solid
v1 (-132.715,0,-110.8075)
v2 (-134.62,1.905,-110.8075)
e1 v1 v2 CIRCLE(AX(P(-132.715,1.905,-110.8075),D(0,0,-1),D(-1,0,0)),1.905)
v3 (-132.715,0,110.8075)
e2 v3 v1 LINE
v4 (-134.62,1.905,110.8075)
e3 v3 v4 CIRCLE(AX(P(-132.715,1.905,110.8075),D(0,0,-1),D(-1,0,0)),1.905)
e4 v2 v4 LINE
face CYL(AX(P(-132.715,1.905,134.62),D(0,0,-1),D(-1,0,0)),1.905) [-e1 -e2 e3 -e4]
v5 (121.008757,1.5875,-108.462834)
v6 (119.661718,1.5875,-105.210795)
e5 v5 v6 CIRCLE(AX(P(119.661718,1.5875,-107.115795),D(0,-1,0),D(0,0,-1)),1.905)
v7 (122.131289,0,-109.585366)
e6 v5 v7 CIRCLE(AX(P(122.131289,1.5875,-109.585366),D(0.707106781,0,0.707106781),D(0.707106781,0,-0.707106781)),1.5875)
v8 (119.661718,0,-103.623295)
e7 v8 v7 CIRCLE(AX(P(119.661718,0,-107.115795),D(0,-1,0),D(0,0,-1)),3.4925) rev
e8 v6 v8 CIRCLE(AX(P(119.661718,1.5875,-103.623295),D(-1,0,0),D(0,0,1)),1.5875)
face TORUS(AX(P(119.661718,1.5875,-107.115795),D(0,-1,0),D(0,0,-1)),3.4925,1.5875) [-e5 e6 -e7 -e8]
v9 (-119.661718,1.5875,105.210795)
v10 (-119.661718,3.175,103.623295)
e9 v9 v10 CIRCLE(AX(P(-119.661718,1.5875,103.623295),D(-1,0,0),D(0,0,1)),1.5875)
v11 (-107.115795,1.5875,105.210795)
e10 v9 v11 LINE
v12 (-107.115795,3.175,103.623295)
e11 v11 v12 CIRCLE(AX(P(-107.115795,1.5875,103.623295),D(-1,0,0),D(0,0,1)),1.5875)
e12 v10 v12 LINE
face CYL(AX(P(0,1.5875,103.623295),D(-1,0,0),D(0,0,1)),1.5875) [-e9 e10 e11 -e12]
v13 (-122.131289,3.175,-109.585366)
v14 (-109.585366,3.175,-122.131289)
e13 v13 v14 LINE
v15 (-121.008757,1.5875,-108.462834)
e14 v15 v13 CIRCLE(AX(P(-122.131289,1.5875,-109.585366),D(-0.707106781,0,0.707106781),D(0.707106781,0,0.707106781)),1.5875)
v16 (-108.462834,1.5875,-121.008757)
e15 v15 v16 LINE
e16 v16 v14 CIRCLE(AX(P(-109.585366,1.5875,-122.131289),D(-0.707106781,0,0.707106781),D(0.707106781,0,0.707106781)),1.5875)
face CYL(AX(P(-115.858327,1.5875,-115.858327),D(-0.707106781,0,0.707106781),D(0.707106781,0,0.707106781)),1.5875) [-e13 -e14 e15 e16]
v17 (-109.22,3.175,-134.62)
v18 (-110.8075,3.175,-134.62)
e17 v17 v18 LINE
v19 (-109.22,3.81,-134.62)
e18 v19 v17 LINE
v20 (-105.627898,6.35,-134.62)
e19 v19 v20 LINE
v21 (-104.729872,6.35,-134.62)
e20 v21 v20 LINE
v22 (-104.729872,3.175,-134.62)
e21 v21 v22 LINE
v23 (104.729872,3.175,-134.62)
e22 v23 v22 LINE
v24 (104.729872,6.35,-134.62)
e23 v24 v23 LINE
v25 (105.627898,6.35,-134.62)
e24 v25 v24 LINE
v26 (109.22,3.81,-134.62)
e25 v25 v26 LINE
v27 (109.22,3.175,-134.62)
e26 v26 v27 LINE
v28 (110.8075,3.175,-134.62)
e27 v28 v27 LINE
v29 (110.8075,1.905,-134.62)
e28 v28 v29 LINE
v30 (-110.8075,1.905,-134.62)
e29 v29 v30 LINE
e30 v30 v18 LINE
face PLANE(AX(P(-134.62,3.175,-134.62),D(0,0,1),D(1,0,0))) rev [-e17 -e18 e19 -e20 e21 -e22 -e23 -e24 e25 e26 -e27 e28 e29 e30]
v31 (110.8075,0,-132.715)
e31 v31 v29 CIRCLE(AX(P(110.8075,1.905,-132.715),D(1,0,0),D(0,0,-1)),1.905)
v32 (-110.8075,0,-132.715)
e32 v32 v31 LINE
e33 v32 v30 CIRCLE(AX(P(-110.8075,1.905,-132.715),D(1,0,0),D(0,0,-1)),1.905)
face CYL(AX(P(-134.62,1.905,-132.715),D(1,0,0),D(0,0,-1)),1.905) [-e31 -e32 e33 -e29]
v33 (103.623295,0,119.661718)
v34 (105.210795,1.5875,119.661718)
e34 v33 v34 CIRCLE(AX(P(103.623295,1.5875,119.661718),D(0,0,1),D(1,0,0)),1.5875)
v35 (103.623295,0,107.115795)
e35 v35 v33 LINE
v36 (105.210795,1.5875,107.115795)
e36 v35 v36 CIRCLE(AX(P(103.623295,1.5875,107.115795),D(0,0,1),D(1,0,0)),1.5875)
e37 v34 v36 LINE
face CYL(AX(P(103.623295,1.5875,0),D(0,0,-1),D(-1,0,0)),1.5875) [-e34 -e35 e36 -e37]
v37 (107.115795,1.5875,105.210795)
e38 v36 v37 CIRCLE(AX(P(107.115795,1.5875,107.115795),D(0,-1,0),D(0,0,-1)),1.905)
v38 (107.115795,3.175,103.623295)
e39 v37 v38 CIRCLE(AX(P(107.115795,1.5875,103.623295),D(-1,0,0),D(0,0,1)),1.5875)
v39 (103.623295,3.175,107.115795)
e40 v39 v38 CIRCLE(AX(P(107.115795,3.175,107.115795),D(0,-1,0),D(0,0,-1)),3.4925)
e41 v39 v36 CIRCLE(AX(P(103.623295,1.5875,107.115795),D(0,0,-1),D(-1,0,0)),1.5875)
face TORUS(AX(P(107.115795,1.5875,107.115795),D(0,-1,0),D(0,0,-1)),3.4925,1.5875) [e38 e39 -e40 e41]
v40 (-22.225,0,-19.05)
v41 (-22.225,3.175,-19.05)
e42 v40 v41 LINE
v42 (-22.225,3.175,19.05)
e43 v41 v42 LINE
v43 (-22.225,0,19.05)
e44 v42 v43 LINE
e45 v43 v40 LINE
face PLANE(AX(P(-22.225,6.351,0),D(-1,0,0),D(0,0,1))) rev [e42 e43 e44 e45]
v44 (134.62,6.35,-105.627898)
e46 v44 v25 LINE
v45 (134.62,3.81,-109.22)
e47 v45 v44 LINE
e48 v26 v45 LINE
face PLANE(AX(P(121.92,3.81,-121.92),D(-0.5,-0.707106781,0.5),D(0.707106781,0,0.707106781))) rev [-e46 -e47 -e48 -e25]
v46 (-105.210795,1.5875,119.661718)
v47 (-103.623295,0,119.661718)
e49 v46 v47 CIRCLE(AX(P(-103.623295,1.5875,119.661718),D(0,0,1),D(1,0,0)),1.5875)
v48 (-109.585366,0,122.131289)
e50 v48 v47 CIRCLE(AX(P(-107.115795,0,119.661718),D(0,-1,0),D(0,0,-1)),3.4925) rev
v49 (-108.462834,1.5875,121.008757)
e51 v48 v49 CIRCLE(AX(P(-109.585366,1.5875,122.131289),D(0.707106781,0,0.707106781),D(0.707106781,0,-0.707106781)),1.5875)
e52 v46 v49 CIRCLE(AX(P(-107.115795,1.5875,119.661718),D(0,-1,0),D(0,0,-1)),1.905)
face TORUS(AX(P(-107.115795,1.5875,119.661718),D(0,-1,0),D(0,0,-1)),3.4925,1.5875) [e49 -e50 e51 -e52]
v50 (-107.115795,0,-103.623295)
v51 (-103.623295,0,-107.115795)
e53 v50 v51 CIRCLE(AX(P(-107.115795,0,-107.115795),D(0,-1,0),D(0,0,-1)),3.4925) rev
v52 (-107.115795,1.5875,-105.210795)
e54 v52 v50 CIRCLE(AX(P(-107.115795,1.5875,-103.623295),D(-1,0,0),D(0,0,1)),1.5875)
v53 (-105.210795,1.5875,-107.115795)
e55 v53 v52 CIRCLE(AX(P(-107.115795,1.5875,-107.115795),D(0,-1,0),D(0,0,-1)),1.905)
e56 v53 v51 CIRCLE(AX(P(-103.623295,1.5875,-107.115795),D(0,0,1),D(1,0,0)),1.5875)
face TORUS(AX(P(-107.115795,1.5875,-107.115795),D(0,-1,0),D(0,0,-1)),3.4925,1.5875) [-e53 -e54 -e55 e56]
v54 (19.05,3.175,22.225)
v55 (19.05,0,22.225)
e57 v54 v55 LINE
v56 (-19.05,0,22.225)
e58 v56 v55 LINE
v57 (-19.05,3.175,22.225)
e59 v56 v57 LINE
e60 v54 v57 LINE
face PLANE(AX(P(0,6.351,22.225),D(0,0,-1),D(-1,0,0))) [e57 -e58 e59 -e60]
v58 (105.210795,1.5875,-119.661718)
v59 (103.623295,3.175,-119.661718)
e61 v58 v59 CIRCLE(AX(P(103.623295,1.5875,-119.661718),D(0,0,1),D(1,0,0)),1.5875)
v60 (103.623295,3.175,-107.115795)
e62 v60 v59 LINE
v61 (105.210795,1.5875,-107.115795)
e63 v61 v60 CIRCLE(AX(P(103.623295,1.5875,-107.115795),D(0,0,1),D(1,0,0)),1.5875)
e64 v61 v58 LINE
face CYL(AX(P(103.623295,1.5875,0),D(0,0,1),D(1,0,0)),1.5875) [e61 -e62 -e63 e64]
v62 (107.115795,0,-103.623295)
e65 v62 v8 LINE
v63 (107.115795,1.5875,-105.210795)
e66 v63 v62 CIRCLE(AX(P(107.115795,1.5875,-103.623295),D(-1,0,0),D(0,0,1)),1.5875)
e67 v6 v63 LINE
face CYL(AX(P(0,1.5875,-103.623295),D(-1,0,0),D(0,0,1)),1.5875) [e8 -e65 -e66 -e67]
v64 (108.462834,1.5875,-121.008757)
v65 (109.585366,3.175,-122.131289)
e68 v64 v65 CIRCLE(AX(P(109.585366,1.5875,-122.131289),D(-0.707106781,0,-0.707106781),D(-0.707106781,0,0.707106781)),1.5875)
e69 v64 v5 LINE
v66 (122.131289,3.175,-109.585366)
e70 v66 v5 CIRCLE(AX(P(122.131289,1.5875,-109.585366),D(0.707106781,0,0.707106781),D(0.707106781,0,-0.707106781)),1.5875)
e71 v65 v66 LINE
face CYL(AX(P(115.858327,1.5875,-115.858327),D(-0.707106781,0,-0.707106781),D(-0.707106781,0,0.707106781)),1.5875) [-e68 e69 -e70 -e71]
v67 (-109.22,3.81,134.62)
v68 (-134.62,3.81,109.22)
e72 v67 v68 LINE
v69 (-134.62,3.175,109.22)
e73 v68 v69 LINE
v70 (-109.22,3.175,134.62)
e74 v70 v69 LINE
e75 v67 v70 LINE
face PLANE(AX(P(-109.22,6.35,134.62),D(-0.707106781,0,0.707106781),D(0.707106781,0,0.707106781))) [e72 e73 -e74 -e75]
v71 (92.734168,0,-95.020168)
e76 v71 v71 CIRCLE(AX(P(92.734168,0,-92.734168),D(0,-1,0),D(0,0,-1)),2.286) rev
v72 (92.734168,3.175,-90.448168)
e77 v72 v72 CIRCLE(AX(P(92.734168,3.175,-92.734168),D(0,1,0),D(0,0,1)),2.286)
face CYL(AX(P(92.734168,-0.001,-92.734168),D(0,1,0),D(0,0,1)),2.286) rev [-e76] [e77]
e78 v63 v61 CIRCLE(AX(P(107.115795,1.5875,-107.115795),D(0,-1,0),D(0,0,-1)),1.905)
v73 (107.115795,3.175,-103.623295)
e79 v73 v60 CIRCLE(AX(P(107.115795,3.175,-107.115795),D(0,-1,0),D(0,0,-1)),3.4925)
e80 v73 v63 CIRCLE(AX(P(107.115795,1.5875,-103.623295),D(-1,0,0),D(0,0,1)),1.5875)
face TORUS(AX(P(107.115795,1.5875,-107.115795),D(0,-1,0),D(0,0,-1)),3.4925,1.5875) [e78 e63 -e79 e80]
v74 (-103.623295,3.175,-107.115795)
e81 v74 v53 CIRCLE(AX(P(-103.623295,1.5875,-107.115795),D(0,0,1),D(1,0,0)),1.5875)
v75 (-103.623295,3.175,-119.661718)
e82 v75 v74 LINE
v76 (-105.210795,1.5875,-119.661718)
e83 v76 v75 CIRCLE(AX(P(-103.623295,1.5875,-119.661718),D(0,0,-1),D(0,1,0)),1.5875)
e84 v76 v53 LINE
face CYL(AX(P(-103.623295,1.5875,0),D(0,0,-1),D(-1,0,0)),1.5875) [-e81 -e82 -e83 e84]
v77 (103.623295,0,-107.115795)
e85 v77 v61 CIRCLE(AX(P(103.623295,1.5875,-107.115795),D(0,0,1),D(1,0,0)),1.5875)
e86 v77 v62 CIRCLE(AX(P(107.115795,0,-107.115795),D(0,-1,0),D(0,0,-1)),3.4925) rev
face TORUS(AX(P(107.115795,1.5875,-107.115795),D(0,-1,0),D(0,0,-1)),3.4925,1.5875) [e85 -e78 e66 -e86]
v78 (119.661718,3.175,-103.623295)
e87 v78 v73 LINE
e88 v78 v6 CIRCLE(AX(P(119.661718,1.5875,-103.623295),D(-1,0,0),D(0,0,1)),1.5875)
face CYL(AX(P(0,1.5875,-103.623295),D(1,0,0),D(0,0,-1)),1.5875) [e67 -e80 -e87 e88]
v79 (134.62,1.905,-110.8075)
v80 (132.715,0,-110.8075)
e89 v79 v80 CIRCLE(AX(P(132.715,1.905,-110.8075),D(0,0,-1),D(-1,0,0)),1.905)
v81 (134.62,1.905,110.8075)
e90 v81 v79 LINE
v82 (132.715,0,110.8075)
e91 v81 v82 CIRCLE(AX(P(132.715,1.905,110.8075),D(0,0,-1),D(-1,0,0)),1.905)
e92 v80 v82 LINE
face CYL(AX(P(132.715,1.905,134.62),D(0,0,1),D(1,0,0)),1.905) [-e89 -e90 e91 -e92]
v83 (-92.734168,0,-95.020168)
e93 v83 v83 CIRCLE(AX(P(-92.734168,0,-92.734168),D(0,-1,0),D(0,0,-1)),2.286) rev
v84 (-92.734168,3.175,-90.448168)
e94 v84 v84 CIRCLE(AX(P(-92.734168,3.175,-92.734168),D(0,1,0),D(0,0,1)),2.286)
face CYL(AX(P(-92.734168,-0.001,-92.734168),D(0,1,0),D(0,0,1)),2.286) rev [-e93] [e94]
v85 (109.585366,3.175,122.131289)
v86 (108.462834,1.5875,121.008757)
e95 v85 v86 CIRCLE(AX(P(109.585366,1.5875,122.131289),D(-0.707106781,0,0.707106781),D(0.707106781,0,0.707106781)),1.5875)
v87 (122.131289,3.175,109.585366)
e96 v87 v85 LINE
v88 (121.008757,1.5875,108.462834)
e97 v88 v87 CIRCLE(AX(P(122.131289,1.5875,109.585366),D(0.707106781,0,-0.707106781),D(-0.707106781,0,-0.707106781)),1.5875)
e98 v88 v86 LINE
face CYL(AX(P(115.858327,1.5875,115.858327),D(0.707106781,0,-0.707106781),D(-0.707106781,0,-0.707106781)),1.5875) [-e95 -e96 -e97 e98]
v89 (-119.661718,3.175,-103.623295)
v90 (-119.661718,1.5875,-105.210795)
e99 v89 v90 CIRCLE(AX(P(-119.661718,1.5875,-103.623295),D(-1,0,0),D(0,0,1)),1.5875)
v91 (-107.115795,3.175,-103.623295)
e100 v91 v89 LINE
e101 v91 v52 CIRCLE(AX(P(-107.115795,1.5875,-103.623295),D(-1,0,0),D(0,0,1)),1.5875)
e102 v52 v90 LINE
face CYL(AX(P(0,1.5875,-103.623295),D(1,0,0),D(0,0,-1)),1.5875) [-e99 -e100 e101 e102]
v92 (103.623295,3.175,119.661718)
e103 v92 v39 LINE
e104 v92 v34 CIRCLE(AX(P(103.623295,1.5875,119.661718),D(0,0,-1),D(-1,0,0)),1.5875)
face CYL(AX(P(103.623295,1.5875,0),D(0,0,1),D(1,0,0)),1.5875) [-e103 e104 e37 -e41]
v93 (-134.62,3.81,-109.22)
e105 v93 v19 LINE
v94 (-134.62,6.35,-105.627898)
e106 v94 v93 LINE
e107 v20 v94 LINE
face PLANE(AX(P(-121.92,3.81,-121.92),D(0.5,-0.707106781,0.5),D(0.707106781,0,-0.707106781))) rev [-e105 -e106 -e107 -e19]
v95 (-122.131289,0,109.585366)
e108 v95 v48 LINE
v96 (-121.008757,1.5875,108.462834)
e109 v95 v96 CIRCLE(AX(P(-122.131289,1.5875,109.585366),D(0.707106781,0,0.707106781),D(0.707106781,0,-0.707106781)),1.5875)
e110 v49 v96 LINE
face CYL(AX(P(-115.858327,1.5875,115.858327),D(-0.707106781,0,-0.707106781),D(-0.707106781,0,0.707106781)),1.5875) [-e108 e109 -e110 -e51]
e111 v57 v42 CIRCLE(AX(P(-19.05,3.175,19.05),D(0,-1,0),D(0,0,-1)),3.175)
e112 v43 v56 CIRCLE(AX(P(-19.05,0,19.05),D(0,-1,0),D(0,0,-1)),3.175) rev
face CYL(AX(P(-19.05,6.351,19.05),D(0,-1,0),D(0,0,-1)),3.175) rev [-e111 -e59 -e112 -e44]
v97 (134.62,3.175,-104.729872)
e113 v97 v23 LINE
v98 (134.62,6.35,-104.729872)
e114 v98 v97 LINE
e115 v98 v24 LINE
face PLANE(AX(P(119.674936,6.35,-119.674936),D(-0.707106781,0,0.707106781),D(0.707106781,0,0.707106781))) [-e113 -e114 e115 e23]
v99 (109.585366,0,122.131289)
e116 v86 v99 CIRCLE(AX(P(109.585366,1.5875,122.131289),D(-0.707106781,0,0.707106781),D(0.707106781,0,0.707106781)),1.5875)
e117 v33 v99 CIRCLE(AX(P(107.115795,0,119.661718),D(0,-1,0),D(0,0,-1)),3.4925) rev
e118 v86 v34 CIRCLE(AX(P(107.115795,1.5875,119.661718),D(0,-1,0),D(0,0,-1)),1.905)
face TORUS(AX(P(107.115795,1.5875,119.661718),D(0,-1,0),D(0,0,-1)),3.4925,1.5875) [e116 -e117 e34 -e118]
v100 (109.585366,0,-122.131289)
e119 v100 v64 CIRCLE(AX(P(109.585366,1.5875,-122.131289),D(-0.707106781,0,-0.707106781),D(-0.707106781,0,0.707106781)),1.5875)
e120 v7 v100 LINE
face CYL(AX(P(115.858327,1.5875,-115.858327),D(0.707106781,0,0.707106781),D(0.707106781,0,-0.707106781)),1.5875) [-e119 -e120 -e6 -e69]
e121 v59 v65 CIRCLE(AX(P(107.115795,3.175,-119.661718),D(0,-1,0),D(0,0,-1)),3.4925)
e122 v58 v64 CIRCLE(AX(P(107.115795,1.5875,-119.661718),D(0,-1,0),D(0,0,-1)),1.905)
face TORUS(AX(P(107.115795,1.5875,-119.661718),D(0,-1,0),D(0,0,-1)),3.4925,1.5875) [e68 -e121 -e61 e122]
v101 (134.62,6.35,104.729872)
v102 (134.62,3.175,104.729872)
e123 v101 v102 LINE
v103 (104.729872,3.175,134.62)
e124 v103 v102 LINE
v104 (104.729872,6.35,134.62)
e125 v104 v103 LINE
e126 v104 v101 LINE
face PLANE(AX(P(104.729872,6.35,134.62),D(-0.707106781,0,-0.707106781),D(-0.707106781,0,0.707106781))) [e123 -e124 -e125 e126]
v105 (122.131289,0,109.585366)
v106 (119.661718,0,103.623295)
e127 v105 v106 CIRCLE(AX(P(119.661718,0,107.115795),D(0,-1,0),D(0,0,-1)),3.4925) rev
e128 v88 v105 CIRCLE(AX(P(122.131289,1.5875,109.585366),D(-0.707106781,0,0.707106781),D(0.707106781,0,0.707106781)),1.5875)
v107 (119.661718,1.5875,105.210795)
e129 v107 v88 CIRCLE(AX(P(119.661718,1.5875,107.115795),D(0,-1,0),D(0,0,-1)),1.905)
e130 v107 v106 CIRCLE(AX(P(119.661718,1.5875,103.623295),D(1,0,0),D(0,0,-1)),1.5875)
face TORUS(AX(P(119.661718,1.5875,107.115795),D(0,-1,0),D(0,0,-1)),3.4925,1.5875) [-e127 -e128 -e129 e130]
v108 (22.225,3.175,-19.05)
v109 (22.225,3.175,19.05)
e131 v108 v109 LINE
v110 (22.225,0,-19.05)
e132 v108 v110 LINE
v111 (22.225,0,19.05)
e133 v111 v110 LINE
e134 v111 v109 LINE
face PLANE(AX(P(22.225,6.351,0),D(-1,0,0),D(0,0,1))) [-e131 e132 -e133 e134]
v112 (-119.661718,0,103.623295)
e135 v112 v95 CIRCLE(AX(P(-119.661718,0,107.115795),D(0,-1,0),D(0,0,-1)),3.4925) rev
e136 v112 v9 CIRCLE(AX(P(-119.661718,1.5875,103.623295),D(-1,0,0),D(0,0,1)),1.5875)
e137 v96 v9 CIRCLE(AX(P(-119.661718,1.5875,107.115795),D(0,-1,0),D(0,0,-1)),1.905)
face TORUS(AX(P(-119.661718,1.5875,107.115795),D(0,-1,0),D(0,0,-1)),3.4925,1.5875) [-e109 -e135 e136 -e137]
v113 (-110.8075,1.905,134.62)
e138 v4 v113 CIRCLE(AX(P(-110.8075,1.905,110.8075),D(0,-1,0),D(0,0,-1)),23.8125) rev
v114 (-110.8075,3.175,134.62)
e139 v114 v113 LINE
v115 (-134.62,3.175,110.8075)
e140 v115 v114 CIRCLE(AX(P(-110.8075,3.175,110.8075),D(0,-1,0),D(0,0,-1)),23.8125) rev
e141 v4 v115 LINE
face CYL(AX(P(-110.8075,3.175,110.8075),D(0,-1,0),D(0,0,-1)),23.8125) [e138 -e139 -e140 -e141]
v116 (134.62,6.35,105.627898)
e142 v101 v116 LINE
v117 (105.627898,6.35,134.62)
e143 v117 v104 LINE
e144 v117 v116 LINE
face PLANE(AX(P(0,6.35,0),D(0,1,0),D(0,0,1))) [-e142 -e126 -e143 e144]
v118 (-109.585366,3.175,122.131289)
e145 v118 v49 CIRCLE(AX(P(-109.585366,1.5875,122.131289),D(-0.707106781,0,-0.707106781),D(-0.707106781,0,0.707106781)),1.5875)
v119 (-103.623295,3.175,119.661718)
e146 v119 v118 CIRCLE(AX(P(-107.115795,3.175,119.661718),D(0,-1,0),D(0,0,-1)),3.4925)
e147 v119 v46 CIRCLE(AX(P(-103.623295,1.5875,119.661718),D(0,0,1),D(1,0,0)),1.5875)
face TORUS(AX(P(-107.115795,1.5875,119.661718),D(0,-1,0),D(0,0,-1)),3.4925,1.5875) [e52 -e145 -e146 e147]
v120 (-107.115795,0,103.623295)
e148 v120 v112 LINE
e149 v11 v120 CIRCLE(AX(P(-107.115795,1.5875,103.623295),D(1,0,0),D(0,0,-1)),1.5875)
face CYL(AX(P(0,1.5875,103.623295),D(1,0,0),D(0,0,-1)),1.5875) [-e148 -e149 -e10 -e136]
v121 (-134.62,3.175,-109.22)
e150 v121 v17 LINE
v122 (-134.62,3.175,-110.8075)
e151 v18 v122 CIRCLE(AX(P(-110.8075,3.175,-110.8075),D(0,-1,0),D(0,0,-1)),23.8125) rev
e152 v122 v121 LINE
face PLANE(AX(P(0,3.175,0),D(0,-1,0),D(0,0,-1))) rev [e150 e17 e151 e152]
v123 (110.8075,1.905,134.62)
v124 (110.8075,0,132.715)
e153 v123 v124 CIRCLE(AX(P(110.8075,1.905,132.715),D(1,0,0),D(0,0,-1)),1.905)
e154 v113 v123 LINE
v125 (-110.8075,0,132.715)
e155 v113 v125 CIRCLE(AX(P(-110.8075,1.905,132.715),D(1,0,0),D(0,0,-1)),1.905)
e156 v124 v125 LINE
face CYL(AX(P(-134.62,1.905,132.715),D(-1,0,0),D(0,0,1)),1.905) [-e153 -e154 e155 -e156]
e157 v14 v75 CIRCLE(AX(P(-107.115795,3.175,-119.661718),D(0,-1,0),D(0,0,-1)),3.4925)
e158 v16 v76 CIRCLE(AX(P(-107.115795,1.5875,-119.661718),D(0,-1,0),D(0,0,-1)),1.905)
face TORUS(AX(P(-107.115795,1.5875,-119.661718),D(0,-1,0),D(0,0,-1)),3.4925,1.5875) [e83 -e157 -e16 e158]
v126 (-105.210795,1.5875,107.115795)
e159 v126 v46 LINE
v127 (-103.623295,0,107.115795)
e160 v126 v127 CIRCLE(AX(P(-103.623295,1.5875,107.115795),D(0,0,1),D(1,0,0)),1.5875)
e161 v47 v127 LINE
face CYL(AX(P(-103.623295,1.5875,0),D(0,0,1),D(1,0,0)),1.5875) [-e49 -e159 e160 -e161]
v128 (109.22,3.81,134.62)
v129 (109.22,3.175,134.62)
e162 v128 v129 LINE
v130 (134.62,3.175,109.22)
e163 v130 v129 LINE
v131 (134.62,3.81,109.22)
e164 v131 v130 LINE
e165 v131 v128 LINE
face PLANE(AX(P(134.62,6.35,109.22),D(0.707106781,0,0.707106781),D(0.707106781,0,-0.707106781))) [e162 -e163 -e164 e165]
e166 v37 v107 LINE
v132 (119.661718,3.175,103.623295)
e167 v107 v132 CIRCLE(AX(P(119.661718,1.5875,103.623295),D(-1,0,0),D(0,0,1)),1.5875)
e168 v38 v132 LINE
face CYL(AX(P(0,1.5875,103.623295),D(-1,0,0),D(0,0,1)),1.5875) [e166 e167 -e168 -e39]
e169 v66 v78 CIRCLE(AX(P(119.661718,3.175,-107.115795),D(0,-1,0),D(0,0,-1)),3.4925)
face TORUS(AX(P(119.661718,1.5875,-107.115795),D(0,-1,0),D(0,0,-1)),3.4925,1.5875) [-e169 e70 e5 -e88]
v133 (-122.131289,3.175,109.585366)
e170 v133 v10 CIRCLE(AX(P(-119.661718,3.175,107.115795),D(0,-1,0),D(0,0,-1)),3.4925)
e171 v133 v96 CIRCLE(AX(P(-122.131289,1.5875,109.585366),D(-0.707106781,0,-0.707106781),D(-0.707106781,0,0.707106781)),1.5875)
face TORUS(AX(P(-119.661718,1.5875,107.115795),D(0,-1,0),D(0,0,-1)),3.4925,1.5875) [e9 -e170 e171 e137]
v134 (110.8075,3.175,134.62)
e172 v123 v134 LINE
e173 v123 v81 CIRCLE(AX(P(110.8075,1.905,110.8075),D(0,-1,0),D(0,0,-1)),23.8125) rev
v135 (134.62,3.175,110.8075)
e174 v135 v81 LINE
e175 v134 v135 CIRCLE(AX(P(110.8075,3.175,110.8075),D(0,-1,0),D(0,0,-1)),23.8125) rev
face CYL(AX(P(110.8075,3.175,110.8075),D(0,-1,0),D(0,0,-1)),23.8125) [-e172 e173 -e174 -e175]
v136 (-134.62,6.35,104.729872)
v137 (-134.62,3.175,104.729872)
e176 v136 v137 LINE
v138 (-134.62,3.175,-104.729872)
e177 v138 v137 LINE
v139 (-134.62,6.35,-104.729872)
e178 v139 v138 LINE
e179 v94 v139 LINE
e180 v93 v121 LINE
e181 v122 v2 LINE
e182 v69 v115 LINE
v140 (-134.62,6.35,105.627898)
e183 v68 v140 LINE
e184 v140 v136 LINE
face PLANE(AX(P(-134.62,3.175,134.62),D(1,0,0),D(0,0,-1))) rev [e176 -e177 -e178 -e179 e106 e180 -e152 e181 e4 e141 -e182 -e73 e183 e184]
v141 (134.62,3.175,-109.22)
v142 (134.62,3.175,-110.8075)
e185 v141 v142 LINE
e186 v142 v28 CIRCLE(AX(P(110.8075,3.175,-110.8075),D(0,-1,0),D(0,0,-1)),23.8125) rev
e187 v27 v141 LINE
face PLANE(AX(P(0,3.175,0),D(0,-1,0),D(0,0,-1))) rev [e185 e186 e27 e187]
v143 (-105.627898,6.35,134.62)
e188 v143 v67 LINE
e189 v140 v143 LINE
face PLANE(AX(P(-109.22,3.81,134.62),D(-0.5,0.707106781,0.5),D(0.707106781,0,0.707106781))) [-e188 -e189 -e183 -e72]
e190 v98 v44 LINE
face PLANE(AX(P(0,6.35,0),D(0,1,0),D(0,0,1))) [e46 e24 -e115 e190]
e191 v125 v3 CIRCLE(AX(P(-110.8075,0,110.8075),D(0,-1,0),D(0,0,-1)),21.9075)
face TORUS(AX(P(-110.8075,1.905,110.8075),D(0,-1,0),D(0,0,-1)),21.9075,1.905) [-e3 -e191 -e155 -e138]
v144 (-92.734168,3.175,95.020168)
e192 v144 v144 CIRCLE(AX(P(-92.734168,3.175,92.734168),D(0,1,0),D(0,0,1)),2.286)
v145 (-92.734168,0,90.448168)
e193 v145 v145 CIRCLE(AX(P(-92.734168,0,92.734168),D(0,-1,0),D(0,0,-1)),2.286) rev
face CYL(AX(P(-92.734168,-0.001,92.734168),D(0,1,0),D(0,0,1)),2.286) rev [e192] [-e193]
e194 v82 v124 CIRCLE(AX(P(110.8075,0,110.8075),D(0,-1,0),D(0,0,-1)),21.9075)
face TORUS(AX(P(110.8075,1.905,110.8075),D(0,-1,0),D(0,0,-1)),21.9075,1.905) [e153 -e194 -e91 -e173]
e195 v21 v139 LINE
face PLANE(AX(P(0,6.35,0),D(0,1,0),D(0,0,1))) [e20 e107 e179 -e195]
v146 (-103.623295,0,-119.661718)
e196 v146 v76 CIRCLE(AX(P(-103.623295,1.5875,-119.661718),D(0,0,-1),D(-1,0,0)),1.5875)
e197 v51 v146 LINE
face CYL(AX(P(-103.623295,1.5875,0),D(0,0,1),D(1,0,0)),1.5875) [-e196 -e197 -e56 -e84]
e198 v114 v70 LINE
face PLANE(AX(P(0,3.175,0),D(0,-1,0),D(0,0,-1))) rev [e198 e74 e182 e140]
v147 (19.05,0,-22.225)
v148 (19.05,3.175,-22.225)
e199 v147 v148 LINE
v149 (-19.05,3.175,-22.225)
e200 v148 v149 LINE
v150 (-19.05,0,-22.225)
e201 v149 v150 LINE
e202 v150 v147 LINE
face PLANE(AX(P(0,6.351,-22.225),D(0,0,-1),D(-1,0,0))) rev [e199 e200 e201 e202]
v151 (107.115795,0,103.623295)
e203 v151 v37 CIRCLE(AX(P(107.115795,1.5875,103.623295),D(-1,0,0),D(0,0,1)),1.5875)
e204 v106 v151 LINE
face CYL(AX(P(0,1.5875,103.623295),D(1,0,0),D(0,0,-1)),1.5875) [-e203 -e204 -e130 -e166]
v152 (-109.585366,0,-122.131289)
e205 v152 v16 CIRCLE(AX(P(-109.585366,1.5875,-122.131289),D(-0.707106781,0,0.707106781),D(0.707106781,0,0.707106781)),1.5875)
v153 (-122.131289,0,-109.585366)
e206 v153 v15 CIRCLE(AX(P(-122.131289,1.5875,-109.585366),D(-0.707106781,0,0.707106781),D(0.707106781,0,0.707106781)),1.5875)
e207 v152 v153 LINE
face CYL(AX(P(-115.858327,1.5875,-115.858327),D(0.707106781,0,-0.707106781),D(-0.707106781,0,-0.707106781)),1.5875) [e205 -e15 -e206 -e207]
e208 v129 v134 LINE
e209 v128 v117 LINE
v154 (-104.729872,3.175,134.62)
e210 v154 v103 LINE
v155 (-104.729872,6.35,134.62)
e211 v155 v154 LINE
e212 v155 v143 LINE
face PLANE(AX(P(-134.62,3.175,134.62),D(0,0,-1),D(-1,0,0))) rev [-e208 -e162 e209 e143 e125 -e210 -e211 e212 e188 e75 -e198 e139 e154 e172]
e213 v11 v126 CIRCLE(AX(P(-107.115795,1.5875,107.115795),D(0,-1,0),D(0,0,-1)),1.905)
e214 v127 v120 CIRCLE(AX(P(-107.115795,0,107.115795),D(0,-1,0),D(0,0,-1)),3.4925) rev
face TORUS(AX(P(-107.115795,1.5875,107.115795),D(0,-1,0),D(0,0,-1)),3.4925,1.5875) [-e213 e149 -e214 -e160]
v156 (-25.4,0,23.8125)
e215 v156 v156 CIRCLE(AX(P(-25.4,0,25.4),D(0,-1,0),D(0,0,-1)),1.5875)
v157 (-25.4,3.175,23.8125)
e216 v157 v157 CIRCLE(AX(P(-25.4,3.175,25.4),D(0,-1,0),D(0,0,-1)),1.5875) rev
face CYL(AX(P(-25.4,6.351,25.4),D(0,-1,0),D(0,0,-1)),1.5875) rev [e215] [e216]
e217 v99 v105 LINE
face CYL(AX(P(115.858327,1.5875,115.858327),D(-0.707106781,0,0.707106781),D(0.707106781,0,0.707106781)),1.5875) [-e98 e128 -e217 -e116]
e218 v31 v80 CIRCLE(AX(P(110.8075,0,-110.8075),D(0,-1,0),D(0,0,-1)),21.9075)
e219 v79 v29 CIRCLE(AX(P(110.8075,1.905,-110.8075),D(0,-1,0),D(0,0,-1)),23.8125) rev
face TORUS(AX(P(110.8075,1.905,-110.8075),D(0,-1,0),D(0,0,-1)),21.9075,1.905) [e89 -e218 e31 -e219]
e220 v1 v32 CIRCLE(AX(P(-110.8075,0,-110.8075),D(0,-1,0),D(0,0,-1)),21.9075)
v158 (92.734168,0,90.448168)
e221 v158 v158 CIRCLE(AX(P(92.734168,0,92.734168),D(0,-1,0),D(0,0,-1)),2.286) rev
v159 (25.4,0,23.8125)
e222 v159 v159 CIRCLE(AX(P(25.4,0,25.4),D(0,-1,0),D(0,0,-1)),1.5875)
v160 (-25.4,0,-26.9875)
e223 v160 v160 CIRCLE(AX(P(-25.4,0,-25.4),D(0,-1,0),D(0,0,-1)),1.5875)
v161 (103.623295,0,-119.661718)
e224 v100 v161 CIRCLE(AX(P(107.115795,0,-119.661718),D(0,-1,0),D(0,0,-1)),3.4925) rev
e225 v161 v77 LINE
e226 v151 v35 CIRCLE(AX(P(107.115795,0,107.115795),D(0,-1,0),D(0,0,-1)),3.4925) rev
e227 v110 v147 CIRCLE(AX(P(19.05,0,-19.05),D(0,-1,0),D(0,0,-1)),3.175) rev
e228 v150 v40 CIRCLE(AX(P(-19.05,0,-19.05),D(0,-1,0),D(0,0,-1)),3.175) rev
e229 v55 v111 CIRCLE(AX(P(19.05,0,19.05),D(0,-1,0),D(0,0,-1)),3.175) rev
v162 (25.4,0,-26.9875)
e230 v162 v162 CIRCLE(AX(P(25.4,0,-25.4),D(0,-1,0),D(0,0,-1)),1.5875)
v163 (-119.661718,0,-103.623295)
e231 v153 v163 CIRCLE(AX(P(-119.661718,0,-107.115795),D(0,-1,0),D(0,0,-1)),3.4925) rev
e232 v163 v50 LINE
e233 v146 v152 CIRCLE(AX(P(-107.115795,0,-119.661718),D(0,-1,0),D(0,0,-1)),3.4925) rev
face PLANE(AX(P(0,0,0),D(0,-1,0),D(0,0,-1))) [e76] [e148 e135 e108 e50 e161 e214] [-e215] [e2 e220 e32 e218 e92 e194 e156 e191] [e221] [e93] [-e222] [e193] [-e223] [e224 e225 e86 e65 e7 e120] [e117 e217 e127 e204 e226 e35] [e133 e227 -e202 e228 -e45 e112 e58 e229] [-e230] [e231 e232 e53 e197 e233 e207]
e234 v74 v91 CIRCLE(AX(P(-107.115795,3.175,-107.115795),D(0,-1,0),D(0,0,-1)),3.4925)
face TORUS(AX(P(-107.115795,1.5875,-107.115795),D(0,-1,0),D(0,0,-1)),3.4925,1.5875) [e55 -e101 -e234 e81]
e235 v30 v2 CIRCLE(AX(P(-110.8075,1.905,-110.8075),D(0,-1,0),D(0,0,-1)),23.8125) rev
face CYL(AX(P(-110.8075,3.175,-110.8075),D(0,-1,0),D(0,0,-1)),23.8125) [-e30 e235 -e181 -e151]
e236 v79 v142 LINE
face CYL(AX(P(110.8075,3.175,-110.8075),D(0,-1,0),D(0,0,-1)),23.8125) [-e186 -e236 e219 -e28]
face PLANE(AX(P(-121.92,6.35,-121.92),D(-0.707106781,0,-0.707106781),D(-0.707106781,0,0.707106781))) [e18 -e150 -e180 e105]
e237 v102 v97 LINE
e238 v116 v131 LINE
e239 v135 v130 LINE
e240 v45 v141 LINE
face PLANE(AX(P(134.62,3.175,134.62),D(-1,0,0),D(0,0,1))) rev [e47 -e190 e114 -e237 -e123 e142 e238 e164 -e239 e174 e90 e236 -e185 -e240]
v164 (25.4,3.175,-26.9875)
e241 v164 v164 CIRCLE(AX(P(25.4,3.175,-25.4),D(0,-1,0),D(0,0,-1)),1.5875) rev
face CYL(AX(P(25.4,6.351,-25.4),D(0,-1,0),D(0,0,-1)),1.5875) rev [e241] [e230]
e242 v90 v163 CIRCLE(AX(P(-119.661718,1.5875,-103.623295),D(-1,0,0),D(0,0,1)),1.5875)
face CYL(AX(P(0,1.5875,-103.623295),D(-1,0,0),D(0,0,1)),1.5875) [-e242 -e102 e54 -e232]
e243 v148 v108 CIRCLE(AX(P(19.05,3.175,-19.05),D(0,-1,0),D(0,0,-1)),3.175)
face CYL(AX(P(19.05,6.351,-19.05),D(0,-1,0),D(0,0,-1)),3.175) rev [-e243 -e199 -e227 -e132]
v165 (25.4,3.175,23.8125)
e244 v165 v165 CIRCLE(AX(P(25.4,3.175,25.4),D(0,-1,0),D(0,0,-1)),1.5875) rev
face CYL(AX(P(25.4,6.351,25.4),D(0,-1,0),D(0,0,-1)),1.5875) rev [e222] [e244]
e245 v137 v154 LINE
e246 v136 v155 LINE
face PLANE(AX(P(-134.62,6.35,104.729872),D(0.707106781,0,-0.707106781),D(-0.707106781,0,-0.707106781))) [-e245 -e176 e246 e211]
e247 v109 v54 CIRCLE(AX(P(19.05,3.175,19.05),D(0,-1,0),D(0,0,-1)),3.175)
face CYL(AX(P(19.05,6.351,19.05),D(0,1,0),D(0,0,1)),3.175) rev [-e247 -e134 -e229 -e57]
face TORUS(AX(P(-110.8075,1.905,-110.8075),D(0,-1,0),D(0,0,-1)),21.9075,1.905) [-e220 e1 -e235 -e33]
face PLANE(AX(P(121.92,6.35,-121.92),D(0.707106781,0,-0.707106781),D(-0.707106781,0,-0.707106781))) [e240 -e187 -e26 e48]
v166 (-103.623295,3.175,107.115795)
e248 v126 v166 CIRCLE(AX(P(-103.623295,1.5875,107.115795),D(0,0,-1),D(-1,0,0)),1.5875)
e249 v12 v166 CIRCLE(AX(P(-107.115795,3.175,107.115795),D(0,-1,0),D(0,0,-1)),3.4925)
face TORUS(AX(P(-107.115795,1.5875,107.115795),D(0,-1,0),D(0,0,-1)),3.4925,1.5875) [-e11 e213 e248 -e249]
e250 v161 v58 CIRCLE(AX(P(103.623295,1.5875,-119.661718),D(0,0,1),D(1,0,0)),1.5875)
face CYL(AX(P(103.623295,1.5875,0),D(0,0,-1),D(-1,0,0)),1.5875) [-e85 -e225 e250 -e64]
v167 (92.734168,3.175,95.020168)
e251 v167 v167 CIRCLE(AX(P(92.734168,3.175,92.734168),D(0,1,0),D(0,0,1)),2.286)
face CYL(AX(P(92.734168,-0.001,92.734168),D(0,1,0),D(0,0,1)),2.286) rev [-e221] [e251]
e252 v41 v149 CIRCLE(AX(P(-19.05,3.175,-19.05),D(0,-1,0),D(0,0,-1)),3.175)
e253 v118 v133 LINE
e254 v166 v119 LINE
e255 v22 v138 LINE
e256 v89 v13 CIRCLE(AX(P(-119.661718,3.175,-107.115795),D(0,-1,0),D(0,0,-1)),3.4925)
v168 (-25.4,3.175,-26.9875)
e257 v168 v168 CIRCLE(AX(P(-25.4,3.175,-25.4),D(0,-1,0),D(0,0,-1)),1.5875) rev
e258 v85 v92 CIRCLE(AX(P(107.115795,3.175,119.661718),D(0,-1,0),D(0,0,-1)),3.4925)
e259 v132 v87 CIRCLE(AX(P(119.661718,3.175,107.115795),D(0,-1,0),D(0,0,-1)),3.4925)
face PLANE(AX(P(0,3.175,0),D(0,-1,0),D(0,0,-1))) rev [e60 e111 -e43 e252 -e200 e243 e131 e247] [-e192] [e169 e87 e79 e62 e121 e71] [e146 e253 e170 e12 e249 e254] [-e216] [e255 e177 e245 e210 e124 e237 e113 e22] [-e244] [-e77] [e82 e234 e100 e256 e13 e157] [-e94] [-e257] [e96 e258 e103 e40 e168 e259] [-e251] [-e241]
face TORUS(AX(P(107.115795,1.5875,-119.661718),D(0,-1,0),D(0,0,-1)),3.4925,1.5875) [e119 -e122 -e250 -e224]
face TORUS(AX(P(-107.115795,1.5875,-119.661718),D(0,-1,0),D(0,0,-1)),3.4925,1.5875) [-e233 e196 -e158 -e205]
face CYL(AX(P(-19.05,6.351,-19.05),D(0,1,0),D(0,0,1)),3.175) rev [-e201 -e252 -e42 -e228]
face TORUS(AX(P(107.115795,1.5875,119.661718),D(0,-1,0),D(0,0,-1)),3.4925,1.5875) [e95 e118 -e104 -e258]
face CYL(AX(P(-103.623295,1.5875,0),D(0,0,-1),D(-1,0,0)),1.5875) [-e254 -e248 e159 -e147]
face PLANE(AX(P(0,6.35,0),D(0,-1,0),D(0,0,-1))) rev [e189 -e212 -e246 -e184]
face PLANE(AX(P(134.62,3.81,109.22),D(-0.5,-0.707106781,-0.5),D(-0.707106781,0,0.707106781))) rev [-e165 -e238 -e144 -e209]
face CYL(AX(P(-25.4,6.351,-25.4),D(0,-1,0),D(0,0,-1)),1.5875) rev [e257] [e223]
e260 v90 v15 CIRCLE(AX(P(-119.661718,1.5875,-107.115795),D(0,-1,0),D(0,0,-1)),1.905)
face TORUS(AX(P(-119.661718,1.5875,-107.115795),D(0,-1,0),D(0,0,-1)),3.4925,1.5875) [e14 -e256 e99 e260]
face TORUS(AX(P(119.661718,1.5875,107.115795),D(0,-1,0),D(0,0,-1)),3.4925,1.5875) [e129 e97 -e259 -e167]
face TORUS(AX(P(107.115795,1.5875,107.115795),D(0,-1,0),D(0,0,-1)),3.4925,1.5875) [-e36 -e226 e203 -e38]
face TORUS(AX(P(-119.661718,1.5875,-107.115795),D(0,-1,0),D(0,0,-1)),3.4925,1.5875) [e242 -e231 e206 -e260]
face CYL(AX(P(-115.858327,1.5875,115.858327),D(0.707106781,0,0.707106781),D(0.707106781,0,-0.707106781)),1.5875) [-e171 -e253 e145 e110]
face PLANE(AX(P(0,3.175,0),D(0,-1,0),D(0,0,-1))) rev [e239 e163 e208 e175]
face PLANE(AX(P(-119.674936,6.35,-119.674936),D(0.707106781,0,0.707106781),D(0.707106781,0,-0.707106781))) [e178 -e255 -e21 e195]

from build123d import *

# Parameters (mm, degrees)
SKETCH1_W           = 269.24
SKETCH1_H           = 269.24
BOSS_EXTRUDE1_DEPTH = 3.175
FILLET1_R           = 23.8125
FILLET2_R           = 1.905
BOSS_EXTRUDE2_DEPTH = 3.175
CUT_EXTRUDE4_REACH  = 192.408
SKETCH8_R           = 2.286
CHAMFER1_SIZE       = 2.54
CUT_EXTRUDE5_REACH  = 192.408
FILLET3_R           = 1.905
FILLET4_R           = 1.5875
FILLET5_R           = 1.5875
CUT_EXTRUDE6_REACH  = 192.487
SKETCH11_W          = 44.45
SKETCH11_H          = 44.45
FILLET6_R           = 3.175
CUT_EXTRUDE7_REACH  = 192.487
SKETCH12_R          = 1.5875


with BuildPart() as part:
    # Sketch1 → Boss-Extrude1 (new body)
    with BuildSketch(Plane(origin=(0, 0, 0), x_dir=(1, 0, 0), z_dir=(0, 1, 0))):
        Rectangle(SKETCH1_W, SKETCH1_H)
    extrude(amount=BOSS_EXTRUDE1_DEPTH)

    # Fillet1
    fillet1_edges = [part.edges().sort_by_distance(p)[0] for p in [
        (134.62, 1.5875, 134.62),
        (-134.62, 1.5875, 134.62),
        (-134.62, 1.5875, -134.62),
        (134.62, 1.5875, -134.62),
    ]]
    fillet(fillet1_edges, radius=FILLET1_R)

    # Fillet2
    fillet2_edges = [part.edges().sort_by_distance(p)[0] for p in [
        (134.62, 0, 0),
        (0, 0, 134.62),
        (-134.62, 0, 0),
        (0, 0, -134.62),
        (-127.645480227, 0, 127.645480227),
        (-127.645480227, 0, -127.645480227),
        (127.645480227, 0, -127.645480227),
        (127.645480227, 0, 127.645480227),
    ]]
    fillet(fillet2_edges, radius=FILLET2_R)

    # Sketch9 → Boss-Extrude2 (add)
    with BuildSketch(Plane(origin=(0, 3.175, 0), x_dir=(1, 0, 0), z_dir=(0, 1, 0))):
        Polygon((-134.62, 104.729871939), (-104.729871939, 134.62), (-109.22, 134.62), (-134.62, 109.22), align=None)
        Polygon((104.729871939, 134.62), (134.62, 104.729871939), (134.62, 109.22), (109.22, 134.62), align=None)
        Polygon((-109.22, -134.62), (-134.62, -109.22), (-134.62, -104.729871939), (-104.729871939, -134.62), align=None)
        Polygon((104.729871939, -134.62), (134.62, -104.729871939), (134.62, -109.22), (109.22, -134.62), align=None)
    extrude(amount=BOSS_EXTRUDE2_DEPTH)

    # Sketch8 → Cut-Extrude4 (cut, up to next)
    with BuildSketch(Plane(origin=(0, 3.175, 0), x_dir=(1, 0, 0), z_dir=(0, 1, 0)), mode=Mode.PRIVATE) as cut_extrude4_sk1:
        with Locations(Location((-92.734167607, -92.734167607, 0), (0, 0, 270))):
            Circle(SKETCH8_R)
    cut_extrude4_tool1 = extrude(cut_extrude4_sk1.sketch, amount=-CUT_EXTRUDE4_REACH, mode=Mode.PRIVATE) & part.part
    # Sketch8 → Cut-Extrude4 (cut, up to next)
    with BuildSketch(Plane(origin=(0, 3.175, 0), x_dir=(1, 0, 0), z_dir=(0, 1, 0)), mode=Mode.PRIVATE) as cut_extrude4_sk2:
        with Locations(Location((92.734167607, -92.734167607, 0), (0, 0, 270))):
            Circle(SKETCH8_R)
    cut_extrude4_tool2 = extrude(cut_extrude4_sk2.sketch, amount=-CUT_EXTRUDE4_REACH, mode=Mode.PRIVATE) & part.part
    # Sketch8 → Cut-Extrude4 (cut, up to next)
    with BuildSketch(Plane(origin=(0, 3.175, 0), x_dir=(1, 0, 0), z_dir=(0, 1, 0)), mode=Mode.PRIVATE) as cut_extrude4_sk3:
        with Locations(Location((-92.734167607, 92.734167607, 0), (0, 0, 270))):
            Circle(SKETCH8_R)
    cut_extrude4_tool3 = extrude(cut_extrude4_sk3.sketch, amount=-CUT_EXTRUDE4_REACH, mode=Mode.PRIVATE) & part.part
    # Sketch8 → Cut-Extrude4 (cut, up to next)
    with BuildSketch(Plane(origin=(0, 3.175, 0), x_dir=(1, 0, 0), z_dir=(0, 1, 0)), mode=Mode.PRIVATE) as cut_extrude4_sk4:
        with Locations(Location((92.734167607, 92.734167607, 0), (0, 0, 270))):
            Circle(SKETCH8_R)
    cut_extrude4_tool4 = extrude(cut_extrude4_sk4.sketch, amount=-CUT_EXTRUDE4_REACH, mode=Mode.PRIVATE) & part.part
    add(cut_extrude4_tool1.solids().sort_by_distance((-92.734168, 3.175, 92.734168))[0], mode=Mode.SUBTRACT)
    add(cut_extrude4_tool2.solids().sort_by_distance((92.734168, 3.175, 92.734168))[0], mode=Mode.SUBTRACT)
    add(cut_extrude4_tool3.solids().sort_by_distance((-92.734168, 3.175, -92.734168))[0], mode=Mode.SUBTRACT)
    add(cut_extrude4_tool4.solids().sort_by_distance((92.734168, 3.175, -92.734168))[0], mode=Mode.SUBTRACT)

    # Chamfer1
    chamfer1_edges = [part.edges().sort_by_distance(p)[0] for p in [
        (121.92, 6.35, 121.92),
        (-121.92, 6.35, -121.92),
        (121.92, 6.35, -121.92),
        (-121.92, 6.35, 121.92),
    ]]
    chamfer(chamfer1_edges, length=CHAMFER1_SIZE)

    # Sketch10 → Cut-Extrude5 (cut, up to next)
    with BuildSketch(Plane(origin=(0, 3.175, 0), x_dir=(1, 0, 0), z_dir=(0, 1, 0)), mode=Mode.PRIVATE) as cut_extrude5_sk1:
        Polygon((-124.260795103, -105.210795103), (-105.210795103, -124.260795103), (-105.210795103, -105.210795103), align=None)
    cut_extrude5_tool1 = extrude(cut_extrude5_sk1.sketch, amount=-CUT_EXTRUDE5_REACH, mode=Mode.PRIVATE) & part.part
    # Sketch10 → Cut-Extrude5 (cut, up to next)
    with BuildSketch(Plane(origin=(0, 3.175, 0), x_dir=(1, 0, 0), z_dir=(0, 1, 0)), mode=Mode.PRIVATE) as cut_extrude5_sk2:
        Polygon((-105.210795103, 105.210795103), (-105.210795103, 124.260795103), (-124.260795103, 105.210795103), align=None)
    cut_extrude5_tool2 = extrude(cut_extrude5_sk2.sketch, amount=-CUT_EXTRUDE5_REACH, mode=Mode.PRIVATE) & part.part
    # Sketch10 → Cut-Extrude5 (cut, up to next)
    with BuildSketch(Plane(origin=(0, 3.175, 0), x_dir=(1, 0, 0), z_dir=(0, 1, 0)), mode=Mode.PRIVATE) as cut_extrude5_sk3:
        Polygon((105.210795103, 105.210795103), (124.260795103, 105.210795103), (105.210795103, 124.260795103), align=None)
    cut_extrude5_tool3 = extrude(cut_extrude5_sk3.sketch, amount=-CUT_EXTRUDE5_REACH, mode=Mode.PRIVATE) & part.part
    # Sketch10 → Cut-Extrude5 (cut, up to next)
    with BuildSketch(Plane(origin=(0, 3.175, 0), x_dir=(1, 0, 0), z_dir=(0, 1, 0)), mode=Mode.PRIVATE) as cut_extrude5_sk4:
        Polygon((105.210795103, -105.210795103), (105.210795103, -124.260795103), (124.260795103, -105.210795103), align=None)
    cut_extrude5_tool4 = extrude(cut_extrude5_sk4.sketch, amount=-CUT_EXTRUDE5_REACH, mode=Mode.PRIVATE) & part.part
    add(cut_extrude5_tool1.solids().sort_by_distance((-111.560795, 3.175, 111.560795))[0], mode=Mode.SUBTRACT)
    add(cut_extrude5_tool2.solids().sort_by_distance((-111.560795, 3.175, -111.560795))[0], mode=Mode.SUBTRACT)
    add(cut_extrude5_tool3.solids().sort_by_distance((111.560795, 3.175, -111.560795))[0], mode=Mode.SUBTRACT)
    add(cut_extrude5_tool4.solids().sort_by_distance((111.560795, 3.175, 111.560795))[0], mode=Mode.SUBTRACT)

    # Fillet3
    fillet3_edges = [part.edges().sort_by_distance(p)[0] for p in [
        (105.210795103, 1.5875, 124.260795103),
        (105.210795103, 1.5875, 105.210795103),
        (124.260795103, 1.5875, 105.210795103),
        (124.260795103, 1.5875, -105.210795103),
        (105.210795103, 1.5875, -105.210795103),
        (105.210795103, 1.5875, -124.260795103),
        (-105.210795103, 1.5875, -124.260795103),
        (-105.210795103, 1.5875, -105.210795103),
        (-124.260795103, 1.5875, -105.210795103),
        (-105.210795103, 1.5875, 124.260795103),
        (-124.260795103, 1.5875, 105.210795103),
        (-105.210795103, 1.5875, 105.210795103),
    ]]
    fillet(fillet3_edges, radius=FILLET3_R)

    # Fillet4
    fillet4_edges = [part.edges().sort_by_distance(p)[0] for p in [
        (105.210795103, 0, 113.388756685),
        (113.388756685, 0, 105.210795103),
        (114.735795103, 0, 114.735795103),
        (105.210795103, 0, -113.388756685),
        (114.735795103, 0, -114.735795103),
        (113.388756685, 0, -105.210795103),
        (-114.735795103, 0, -114.735795103),
        (-105.210795103, 0, -113.388756685),
        (-113.388756685, 0, -105.210795103),
        (-113.388756685, 0, 105.210795103),
        (-105.210795103, 0, 113.388756685),
        (-114.735795103, 0, 114.735795103),
        (105.768756685, 0, 105.768756685),
        (121.421708776, 0, 106.386783164),
        (106.386783164, 0, 121.421708776),
        (106.386783164, 0, -121.421708776),
        (121.421708776, 0, -106.386783164),
        (105.768756685, 0, -105.768756685),
        (-106.386783164, 0, -121.421708776),
        (-105.768756685, 0, -105.768756685),
        (-121.421708776, 0, -106.386783164),
        (-105.768756685, 0, 105.768756685),
        (-106.386783164, 0, 121.421708776),
        (-121.421708776, 0, 106.386783164),
    ]]
    fillet(fillet4_edges, radius=FILLET4_R)

    # Fillet5
    fillet5_edges = [part.edges().sort_by_distance(p)[0] for p in [
        (105.768756685, 3.175, 105.768756685),
        (113.388756685, 3.175, 105.210795103),
        (121.421708776, 3.175, 106.386783164),
        (114.735795103, 3.175, 114.735795103),
        (106.386783164, 3.175, 121.421708776),
        (105.768756685, 3.175, -105.768756685),
        (105.210795103, 3.175, -113.388756685),
        (106.386783164, 3.175, -121.421708776),
        (114.735795103, 3.175, -114.735795103),
        (121.421708776, 3.175, -106.386783164),
        (-121.421708776, 3.175, -106.386783164),
        (-114.735795103, 3.175, -114.735795103),
        (-106.386783164, 3.175, -121.421708776),
        (-105.210795103, 3.175, -113.388756685),
        (-105.768756685, 3.175, -105.768756685),
        (-121.421708776, 3.175, 106.386783164),
        (-113.388756685, 3.175, 105.210795103),
        (-105.768756685, 3.175, 105.768756685),
        (-105.210795103, 3.175, 113.388756685),
        (-106.386783164, 3.175, 121.421708776),
        (105.210795103, 3.175, 113.388756685),
        (113.388756685, 3.175, -105.210795103),
        (-113.388756685, 3.175, -105.210795103),
        (-114.735795103, 3.175, 114.735795103),
    ]]
    fillet(fillet5_edges, radius=FILLET5_R - 0.0001)  # a hair under: the kernel refuses the full size

    # Sketch11 → Cut-Extrude6 (cut, up to next)
    with BuildSketch(Plane.XZ, mode=Mode.PRIVATE) as cut_extrude6_sk1:
        Rectangle(SKETCH11_W, SKETCH11_H)
    cut_extrude6_tool1 = extrude(cut_extrude6_sk1.sketch, amount=-CUT_EXTRUDE6_REACH, mode=Mode.PRIVATE) & part.part
    add(cut_extrude6_tool1.solids().sort_by_distance((0, 0, 0))[0], mode=Mode.SUBTRACT)

    # Fillet6
    fillet6_edges = [part.edges().sort_by_distance(p)[0] for p in [
        (22.225, 1.5875, 22.225),
        (22.225, 1.5875, -22.225),
        (-22.225, 1.5875, -22.225),
        (-22.225, 1.5875, 22.225),
    ]]
    fillet(fillet6_edges, radius=FILLET6_R)

    # Sketch12 → Cut-Extrude7 (cut, up to next)
    with BuildSketch(Plane.XZ, mode=Mode.PRIVATE) as cut_extrude7_sk1:
        with Locations(Location((25.4, -25.4, 0), (0, 0, 270))):
            Circle(SKETCH12_R)
    cut_extrude7_tool1 = extrude(cut_extrude7_sk1.sketch, amount=-CUT_EXTRUDE7_REACH, mode=Mode.PRIVATE) & part.part
    # Sketch12 → Cut-Extrude7 (cut, up to next)
    with BuildSketch(Plane.XZ, mode=Mode.PRIVATE) as cut_extrude7_sk2:
        with Locations(Location((-25.4, -25.4, 0), (0, 0, 270))):
            Circle(SKETCH12_R)
    cut_extrude7_tool2 = extrude(cut_extrude7_sk2.sketch, amount=-CUT_EXTRUDE7_REACH, mode=Mode.PRIVATE) & part.part
    # Sketch12 → Cut-Extrude7 (cut, up to next)
    with BuildSketch(Plane.XZ, mode=Mode.PRIVATE) as cut_extrude7_sk3:
        with Locations(Location((-25.4, 25.4, 0), (0, 0, 270))):
            Circle(SKETCH12_R)
    cut_extrude7_tool3 = extrude(cut_extrude7_sk3.sketch, amount=-CUT_EXTRUDE7_REACH, mode=Mode.PRIVATE) & part.part
    # Sketch12 → Cut-Extrude7 (cut, up to next)
    with BuildSketch(Plane.XZ, mode=Mode.PRIVATE) as cut_extrude7_sk4:
        with Locations(Location((25.4, 25.4, 0), (0, 0, 270))):
            Circle(SKETCH12_R)
    cut_extrude7_tool4 = extrude(cut_extrude7_sk4.sketch, amount=-CUT_EXTRUDE7_REACH, mode=Mode.PRIVATE) & part.part
    add(cut_extrude7_tool1.solids().sort_by_distance((25.4, 0, -25.4))[0], mode=Mode.SUBTRACT)
    add(cut_extrude7_tool2.solids().sort_by_distance((-25.4, 0, -25.4))[0], mode=Mode.SUBTRACT)
    add(cut_extrude7_tool3.solids().sort_by_distance((-25.4, 0, 25.4))[0], mode=Mode.SUBTRACT)
    add(cut_extrude7_tool4.solids().sort_by_distance((25.4, 0, 25.4))[0], mode=Mode.SUBTRACT)


solid = part.part
